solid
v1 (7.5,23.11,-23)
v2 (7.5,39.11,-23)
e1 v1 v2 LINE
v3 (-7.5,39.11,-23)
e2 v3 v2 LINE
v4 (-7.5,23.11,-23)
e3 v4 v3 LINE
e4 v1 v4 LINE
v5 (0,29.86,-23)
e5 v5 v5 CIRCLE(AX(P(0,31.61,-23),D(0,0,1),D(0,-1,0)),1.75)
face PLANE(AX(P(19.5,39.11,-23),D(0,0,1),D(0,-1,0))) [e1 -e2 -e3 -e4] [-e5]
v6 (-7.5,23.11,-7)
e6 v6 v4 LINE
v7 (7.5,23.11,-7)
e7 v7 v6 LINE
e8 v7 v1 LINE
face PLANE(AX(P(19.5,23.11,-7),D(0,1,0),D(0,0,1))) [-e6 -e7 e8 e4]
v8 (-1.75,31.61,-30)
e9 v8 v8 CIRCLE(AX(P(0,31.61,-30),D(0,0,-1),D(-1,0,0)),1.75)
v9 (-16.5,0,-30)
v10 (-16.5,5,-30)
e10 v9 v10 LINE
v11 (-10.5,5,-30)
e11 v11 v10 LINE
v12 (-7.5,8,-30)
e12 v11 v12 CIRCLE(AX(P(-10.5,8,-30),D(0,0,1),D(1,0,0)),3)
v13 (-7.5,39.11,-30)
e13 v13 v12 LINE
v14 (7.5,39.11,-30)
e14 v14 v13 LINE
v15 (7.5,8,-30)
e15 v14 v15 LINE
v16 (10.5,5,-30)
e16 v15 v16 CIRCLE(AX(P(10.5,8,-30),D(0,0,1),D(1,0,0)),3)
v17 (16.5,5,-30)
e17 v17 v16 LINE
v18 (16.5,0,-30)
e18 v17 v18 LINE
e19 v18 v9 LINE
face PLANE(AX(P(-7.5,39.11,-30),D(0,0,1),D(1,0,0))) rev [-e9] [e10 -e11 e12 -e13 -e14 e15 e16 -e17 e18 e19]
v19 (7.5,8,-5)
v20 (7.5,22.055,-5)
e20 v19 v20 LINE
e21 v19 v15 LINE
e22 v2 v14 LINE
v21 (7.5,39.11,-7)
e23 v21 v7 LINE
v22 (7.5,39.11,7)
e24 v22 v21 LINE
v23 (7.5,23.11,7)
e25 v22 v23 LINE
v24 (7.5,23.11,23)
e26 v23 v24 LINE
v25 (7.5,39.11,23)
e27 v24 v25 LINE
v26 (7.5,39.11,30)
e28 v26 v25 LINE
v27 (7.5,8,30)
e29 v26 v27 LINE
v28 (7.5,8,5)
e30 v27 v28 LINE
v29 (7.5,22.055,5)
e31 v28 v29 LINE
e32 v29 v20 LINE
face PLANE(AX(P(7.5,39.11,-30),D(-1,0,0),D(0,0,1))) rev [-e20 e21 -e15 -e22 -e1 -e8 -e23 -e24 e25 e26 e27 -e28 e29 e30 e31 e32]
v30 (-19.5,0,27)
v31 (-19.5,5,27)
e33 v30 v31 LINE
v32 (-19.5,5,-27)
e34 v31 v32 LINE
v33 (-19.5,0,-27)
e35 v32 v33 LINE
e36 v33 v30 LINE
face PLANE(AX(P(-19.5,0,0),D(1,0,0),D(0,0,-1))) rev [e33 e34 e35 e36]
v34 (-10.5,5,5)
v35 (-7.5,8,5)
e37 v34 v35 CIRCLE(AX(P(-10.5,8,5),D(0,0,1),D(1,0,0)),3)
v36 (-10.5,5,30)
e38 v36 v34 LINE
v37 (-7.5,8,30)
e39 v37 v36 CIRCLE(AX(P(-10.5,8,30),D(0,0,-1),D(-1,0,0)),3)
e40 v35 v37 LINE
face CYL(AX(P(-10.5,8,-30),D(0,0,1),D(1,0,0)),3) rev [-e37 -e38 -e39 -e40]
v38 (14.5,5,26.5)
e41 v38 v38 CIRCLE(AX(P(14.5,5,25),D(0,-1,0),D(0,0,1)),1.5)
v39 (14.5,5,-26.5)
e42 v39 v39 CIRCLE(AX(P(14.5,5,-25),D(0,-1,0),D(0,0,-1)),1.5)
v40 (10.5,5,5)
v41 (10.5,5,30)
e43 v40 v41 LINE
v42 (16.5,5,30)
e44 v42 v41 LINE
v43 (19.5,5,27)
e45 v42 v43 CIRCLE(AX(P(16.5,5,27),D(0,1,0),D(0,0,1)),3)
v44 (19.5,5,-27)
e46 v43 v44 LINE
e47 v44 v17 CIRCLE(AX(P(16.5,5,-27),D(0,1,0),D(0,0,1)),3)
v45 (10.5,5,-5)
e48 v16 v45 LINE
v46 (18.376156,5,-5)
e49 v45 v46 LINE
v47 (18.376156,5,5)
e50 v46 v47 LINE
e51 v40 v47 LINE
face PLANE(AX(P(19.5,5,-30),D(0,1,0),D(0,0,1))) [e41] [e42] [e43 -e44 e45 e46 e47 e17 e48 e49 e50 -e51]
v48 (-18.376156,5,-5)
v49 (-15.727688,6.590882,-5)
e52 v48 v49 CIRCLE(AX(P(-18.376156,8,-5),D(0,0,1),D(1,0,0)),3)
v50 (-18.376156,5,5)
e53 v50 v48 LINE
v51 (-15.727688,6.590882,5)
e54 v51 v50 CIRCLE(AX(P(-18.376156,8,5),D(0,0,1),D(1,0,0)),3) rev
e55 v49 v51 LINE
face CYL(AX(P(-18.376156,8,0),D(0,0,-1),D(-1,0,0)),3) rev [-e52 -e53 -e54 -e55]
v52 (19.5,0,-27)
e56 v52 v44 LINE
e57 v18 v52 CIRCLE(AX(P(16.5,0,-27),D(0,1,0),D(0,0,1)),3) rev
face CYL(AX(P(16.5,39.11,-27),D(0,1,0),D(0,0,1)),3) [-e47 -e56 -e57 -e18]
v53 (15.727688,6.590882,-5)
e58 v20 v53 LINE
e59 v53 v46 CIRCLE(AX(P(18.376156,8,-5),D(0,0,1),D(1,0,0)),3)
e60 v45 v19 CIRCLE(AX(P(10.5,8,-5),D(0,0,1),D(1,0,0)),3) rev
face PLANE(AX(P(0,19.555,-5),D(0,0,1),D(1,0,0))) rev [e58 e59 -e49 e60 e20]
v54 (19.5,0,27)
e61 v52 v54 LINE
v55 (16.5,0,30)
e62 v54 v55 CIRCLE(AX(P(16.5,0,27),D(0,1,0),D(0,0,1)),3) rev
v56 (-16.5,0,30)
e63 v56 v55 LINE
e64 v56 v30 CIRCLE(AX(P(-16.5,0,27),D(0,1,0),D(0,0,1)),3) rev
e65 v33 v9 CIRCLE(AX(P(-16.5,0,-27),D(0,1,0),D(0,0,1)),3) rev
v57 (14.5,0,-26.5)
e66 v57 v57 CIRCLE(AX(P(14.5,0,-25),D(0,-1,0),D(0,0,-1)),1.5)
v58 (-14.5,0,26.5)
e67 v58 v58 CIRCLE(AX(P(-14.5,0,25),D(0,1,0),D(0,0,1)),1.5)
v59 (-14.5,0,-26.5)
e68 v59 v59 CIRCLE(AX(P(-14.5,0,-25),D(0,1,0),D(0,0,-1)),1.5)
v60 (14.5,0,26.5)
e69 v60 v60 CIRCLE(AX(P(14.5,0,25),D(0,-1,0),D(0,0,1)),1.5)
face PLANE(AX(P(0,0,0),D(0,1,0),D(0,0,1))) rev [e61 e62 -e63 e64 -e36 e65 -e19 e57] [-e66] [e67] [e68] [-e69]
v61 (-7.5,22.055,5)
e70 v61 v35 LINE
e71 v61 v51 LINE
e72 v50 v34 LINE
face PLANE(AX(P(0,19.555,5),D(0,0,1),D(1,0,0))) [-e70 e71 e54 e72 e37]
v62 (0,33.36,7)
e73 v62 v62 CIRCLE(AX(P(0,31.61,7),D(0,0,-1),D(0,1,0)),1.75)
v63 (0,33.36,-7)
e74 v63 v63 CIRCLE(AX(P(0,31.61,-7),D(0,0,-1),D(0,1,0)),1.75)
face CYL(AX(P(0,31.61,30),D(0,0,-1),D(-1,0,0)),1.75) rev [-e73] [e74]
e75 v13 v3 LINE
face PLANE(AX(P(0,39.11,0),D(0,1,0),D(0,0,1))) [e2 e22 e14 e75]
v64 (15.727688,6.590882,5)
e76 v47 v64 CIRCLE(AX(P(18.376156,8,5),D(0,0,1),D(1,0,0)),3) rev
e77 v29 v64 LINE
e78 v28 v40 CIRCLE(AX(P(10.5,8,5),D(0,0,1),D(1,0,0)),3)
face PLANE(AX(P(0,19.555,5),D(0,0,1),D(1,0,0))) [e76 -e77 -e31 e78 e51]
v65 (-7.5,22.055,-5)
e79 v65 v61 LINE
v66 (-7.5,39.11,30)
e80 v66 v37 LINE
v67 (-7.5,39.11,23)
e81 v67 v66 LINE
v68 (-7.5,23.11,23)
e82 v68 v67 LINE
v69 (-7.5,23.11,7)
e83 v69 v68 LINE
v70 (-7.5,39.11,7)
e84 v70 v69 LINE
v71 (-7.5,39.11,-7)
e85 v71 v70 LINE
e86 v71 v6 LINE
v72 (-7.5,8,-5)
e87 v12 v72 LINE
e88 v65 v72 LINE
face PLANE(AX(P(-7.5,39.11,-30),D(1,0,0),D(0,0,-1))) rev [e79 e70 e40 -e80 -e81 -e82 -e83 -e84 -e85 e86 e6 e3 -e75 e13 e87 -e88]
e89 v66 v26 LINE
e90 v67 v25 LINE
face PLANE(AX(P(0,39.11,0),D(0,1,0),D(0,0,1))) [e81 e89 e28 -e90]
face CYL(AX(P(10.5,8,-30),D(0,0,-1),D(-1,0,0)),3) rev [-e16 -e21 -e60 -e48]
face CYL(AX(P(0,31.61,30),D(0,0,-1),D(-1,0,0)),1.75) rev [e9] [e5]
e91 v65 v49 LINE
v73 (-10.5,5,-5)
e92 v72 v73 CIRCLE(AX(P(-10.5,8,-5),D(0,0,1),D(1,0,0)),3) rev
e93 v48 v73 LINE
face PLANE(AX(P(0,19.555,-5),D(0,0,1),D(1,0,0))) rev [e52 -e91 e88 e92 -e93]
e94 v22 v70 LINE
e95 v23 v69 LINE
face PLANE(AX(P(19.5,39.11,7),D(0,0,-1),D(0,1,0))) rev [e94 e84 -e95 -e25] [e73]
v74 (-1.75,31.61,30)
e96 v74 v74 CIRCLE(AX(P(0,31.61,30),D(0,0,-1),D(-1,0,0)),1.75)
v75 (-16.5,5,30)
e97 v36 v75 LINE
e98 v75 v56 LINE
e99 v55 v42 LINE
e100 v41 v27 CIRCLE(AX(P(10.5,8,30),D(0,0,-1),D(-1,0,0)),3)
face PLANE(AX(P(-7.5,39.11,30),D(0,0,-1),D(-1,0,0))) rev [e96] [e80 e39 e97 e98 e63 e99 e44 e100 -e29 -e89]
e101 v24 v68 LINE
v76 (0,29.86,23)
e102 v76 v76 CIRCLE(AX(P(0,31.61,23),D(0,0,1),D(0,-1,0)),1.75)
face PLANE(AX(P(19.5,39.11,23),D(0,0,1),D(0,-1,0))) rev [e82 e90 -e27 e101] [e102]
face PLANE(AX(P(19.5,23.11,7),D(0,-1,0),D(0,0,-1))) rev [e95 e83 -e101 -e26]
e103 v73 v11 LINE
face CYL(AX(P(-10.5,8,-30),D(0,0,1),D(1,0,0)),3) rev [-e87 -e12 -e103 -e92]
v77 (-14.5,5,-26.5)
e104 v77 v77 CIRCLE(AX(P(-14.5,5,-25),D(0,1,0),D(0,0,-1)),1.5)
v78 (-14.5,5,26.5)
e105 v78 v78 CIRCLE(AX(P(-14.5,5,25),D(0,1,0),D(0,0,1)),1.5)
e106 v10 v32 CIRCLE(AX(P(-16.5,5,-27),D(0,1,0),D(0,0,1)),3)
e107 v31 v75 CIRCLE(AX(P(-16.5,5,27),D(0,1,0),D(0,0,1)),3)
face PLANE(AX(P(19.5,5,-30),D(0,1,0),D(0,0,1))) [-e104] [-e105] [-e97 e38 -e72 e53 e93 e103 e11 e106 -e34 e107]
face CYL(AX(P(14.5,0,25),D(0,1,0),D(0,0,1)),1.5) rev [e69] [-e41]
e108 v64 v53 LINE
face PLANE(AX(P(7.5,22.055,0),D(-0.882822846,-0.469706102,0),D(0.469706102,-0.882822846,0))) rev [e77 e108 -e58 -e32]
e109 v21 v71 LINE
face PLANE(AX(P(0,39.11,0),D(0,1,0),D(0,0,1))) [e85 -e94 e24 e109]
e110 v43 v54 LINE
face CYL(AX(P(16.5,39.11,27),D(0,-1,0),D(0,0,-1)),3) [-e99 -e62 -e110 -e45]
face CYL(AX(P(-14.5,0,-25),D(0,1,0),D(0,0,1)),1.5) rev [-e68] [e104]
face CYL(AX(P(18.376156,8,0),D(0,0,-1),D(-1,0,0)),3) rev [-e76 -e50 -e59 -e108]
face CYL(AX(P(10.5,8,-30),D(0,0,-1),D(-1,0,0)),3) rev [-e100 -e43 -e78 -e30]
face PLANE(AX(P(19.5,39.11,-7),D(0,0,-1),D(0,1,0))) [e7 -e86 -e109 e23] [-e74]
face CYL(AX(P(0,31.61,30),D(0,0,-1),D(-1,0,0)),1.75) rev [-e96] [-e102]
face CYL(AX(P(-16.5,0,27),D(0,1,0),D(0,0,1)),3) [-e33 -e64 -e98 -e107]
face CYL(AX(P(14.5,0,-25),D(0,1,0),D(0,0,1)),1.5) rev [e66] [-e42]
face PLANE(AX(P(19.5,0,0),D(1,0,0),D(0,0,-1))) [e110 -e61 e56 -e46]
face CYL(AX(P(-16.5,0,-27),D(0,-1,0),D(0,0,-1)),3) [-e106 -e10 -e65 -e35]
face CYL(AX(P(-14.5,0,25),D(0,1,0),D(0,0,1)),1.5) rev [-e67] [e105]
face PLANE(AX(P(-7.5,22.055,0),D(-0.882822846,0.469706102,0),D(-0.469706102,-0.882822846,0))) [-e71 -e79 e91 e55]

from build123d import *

# Parameters (mm, degrees)
SKETCH1_W                = 15
SKETCH1_H                = 60
BOSS_EXTRUDE2_DEPTH      = 39.11
BOSS_EXTRUDE3_DEPTH      = 12
BOSS_EXTRUDE3_DEPTH_BACK = 27
SKETCH3_W                = 60
SKETCH3_H                = 5
RIB1_REACH               = 55.008
SKETCH5_WALL_W           = 127.334599132
SKETCH5_WALL_H           = 10
SKETCH6_R                = 1.5
CUT_EXTRUDE2_DEPTH       = 50.434219929
SKETCH7_W                = 16
SKETCH7_H                = 16
CUT_EXTRUDE3_DEPTH       = 57.201353187
SKETCH8_R                = 1.75
CUT_EXTRUDE4_DEPTH       = 75.228310637
FILLET1_R                = 3


with BuildPart() as part:
    # Sketch1 → Boss-Extrude2 (new body)
    with BuildSketch(Plane(origin=(0, 0, 0), x_dir=(1, 0, 0), z_dir=(0, 1, 0))):
        Rectangle(SKETCH1_W, SKETCH1_H)
    extrude(amount=BOSS_EXTRUDE2_DEPTH)

    # Sketch3 → Boss-Extrude3 (add, two sides: drawn at the far end of the back side and taken through both)
    with BuildSketch(Plane.ZY.offset(7.5).offset(-BOSS_EXTRUDE3_DEPTH_BACK)):
        with Locations((0, 2.5)):
            Rectangle(SKETCH3_W, SKETCH3_H)
    extrude(amount=BOSS_EXTRUDE3_DEPTH + BOSS_EXTRUDE3_DEPTH_BACK)

    # Sketch5 wall → Rib1 (add, up to next)
    with BuildSketch(Plane(origin=(-12.037058369, 13.5275, 0), x_dir=(-0.46970610176, -0.882822846311, 0), z_dir=(0.882822846311, -0.46970610176, 0)), mode=Mode.PRIVATE) as rib1_sk1:
        Rectangle(SKETCH5_WALL_W, SKETCH5_WALL_H)
    rib1_tool1 = extrude(rib1_sk1.sketch, amount=RIB1_REACH, mode=Mode.PRIVATE) - part.part
    rib1 = rib1_tool1.solids().sort_by_distance((-12.037058369, 13.5275, 0))[0]
    add(rib1)

    # Sketch6 → Cut-Extrude2 (cut, through all)
    with BuildSketch(Plane(origin=(0, 5, 0), x_dir=(1, 0, 0), z_dir=(0, 1, 0))):
        with Locations((-14.5, -25)):
            Circle(SKETCH6_R)
        with Locations((-14.5, 25)):
            Circle(SKETCH6_R)
    cut_extrude2 = extrude(amount=-CUT_EXTRUDE2_DEPTH, mode=Mode.SUBTRACT)

    # Mirror1: Rib1, Cut-Extrude2 across plane
    add(rib1.mirror(Plane(origin=(0, 0, 0), x_dir=(0, 0, 1), z_dir=(1, 0, 0))))
    add(cut_extrude2.mirror(Plane(origin=(0, 0, 0), x_dir=(0, 0, 1), z_dir=(1, 0, 0))), mode=Mode.SUBTRACT)

    # Sketch7 → Cut-Extrude3 (cut, through all)
    with BuildSketch(Plane.ZY.offset(7.5)):
        with Locations((15, 31.11)):
            Rectangle(SKETCH7_W, SKETCH7_H)
    cut_extrude3 = extrude(amount=-CUT_EXTRUDE3_DEPTH, mode=Mode.SUBTRACT)

    # Mirror2: Cut-Extrude3 across plane
    add(cut_extrude3.mirror(Plane.XY), mode=Mode.SUBTRACT)

    # Sketch8 → Cut-Extrude4 (cut, through all)
    with BuildSketch(Plane(origin=(0, 0, -30), x_dir=(-1, 0, 0), z_dir=(0, 0, -1))):
        with Locations((0, 31.61)):
            Circle(SKETCH8_R)
    extrude(amount=-CUT_EXTRUDE4_DEPTH, mode=Mode.SUBTRACT)

    # Fillet1
    fillet1_edges = [part.edges().sort_by_distance(p)[0] for p in [
        (-16.574116738, 5, 0),
        (-7.5, 5, -17.5),
        (-7.5, 5, 17.5),
        (16.574116738, 5, 0),
        (7.5, 5, 17.5),
        (7.5, 5, -17.5),
    ]]
    fillet(fillet1_edges, radius=FILLET1_R)
    fillet1_2_edges = [part.edges().sort_by_distance(p)[0] for p in [
        (19.5, 2.5, -30),
        (19.5, 2.5, 30),
        (-19.5, 2.5, 30),
        (-19.5, 2.5, -30),
    ]]
    fillet(fillet1_2_edges, radius=FILLET1_R)


solid = part.part
